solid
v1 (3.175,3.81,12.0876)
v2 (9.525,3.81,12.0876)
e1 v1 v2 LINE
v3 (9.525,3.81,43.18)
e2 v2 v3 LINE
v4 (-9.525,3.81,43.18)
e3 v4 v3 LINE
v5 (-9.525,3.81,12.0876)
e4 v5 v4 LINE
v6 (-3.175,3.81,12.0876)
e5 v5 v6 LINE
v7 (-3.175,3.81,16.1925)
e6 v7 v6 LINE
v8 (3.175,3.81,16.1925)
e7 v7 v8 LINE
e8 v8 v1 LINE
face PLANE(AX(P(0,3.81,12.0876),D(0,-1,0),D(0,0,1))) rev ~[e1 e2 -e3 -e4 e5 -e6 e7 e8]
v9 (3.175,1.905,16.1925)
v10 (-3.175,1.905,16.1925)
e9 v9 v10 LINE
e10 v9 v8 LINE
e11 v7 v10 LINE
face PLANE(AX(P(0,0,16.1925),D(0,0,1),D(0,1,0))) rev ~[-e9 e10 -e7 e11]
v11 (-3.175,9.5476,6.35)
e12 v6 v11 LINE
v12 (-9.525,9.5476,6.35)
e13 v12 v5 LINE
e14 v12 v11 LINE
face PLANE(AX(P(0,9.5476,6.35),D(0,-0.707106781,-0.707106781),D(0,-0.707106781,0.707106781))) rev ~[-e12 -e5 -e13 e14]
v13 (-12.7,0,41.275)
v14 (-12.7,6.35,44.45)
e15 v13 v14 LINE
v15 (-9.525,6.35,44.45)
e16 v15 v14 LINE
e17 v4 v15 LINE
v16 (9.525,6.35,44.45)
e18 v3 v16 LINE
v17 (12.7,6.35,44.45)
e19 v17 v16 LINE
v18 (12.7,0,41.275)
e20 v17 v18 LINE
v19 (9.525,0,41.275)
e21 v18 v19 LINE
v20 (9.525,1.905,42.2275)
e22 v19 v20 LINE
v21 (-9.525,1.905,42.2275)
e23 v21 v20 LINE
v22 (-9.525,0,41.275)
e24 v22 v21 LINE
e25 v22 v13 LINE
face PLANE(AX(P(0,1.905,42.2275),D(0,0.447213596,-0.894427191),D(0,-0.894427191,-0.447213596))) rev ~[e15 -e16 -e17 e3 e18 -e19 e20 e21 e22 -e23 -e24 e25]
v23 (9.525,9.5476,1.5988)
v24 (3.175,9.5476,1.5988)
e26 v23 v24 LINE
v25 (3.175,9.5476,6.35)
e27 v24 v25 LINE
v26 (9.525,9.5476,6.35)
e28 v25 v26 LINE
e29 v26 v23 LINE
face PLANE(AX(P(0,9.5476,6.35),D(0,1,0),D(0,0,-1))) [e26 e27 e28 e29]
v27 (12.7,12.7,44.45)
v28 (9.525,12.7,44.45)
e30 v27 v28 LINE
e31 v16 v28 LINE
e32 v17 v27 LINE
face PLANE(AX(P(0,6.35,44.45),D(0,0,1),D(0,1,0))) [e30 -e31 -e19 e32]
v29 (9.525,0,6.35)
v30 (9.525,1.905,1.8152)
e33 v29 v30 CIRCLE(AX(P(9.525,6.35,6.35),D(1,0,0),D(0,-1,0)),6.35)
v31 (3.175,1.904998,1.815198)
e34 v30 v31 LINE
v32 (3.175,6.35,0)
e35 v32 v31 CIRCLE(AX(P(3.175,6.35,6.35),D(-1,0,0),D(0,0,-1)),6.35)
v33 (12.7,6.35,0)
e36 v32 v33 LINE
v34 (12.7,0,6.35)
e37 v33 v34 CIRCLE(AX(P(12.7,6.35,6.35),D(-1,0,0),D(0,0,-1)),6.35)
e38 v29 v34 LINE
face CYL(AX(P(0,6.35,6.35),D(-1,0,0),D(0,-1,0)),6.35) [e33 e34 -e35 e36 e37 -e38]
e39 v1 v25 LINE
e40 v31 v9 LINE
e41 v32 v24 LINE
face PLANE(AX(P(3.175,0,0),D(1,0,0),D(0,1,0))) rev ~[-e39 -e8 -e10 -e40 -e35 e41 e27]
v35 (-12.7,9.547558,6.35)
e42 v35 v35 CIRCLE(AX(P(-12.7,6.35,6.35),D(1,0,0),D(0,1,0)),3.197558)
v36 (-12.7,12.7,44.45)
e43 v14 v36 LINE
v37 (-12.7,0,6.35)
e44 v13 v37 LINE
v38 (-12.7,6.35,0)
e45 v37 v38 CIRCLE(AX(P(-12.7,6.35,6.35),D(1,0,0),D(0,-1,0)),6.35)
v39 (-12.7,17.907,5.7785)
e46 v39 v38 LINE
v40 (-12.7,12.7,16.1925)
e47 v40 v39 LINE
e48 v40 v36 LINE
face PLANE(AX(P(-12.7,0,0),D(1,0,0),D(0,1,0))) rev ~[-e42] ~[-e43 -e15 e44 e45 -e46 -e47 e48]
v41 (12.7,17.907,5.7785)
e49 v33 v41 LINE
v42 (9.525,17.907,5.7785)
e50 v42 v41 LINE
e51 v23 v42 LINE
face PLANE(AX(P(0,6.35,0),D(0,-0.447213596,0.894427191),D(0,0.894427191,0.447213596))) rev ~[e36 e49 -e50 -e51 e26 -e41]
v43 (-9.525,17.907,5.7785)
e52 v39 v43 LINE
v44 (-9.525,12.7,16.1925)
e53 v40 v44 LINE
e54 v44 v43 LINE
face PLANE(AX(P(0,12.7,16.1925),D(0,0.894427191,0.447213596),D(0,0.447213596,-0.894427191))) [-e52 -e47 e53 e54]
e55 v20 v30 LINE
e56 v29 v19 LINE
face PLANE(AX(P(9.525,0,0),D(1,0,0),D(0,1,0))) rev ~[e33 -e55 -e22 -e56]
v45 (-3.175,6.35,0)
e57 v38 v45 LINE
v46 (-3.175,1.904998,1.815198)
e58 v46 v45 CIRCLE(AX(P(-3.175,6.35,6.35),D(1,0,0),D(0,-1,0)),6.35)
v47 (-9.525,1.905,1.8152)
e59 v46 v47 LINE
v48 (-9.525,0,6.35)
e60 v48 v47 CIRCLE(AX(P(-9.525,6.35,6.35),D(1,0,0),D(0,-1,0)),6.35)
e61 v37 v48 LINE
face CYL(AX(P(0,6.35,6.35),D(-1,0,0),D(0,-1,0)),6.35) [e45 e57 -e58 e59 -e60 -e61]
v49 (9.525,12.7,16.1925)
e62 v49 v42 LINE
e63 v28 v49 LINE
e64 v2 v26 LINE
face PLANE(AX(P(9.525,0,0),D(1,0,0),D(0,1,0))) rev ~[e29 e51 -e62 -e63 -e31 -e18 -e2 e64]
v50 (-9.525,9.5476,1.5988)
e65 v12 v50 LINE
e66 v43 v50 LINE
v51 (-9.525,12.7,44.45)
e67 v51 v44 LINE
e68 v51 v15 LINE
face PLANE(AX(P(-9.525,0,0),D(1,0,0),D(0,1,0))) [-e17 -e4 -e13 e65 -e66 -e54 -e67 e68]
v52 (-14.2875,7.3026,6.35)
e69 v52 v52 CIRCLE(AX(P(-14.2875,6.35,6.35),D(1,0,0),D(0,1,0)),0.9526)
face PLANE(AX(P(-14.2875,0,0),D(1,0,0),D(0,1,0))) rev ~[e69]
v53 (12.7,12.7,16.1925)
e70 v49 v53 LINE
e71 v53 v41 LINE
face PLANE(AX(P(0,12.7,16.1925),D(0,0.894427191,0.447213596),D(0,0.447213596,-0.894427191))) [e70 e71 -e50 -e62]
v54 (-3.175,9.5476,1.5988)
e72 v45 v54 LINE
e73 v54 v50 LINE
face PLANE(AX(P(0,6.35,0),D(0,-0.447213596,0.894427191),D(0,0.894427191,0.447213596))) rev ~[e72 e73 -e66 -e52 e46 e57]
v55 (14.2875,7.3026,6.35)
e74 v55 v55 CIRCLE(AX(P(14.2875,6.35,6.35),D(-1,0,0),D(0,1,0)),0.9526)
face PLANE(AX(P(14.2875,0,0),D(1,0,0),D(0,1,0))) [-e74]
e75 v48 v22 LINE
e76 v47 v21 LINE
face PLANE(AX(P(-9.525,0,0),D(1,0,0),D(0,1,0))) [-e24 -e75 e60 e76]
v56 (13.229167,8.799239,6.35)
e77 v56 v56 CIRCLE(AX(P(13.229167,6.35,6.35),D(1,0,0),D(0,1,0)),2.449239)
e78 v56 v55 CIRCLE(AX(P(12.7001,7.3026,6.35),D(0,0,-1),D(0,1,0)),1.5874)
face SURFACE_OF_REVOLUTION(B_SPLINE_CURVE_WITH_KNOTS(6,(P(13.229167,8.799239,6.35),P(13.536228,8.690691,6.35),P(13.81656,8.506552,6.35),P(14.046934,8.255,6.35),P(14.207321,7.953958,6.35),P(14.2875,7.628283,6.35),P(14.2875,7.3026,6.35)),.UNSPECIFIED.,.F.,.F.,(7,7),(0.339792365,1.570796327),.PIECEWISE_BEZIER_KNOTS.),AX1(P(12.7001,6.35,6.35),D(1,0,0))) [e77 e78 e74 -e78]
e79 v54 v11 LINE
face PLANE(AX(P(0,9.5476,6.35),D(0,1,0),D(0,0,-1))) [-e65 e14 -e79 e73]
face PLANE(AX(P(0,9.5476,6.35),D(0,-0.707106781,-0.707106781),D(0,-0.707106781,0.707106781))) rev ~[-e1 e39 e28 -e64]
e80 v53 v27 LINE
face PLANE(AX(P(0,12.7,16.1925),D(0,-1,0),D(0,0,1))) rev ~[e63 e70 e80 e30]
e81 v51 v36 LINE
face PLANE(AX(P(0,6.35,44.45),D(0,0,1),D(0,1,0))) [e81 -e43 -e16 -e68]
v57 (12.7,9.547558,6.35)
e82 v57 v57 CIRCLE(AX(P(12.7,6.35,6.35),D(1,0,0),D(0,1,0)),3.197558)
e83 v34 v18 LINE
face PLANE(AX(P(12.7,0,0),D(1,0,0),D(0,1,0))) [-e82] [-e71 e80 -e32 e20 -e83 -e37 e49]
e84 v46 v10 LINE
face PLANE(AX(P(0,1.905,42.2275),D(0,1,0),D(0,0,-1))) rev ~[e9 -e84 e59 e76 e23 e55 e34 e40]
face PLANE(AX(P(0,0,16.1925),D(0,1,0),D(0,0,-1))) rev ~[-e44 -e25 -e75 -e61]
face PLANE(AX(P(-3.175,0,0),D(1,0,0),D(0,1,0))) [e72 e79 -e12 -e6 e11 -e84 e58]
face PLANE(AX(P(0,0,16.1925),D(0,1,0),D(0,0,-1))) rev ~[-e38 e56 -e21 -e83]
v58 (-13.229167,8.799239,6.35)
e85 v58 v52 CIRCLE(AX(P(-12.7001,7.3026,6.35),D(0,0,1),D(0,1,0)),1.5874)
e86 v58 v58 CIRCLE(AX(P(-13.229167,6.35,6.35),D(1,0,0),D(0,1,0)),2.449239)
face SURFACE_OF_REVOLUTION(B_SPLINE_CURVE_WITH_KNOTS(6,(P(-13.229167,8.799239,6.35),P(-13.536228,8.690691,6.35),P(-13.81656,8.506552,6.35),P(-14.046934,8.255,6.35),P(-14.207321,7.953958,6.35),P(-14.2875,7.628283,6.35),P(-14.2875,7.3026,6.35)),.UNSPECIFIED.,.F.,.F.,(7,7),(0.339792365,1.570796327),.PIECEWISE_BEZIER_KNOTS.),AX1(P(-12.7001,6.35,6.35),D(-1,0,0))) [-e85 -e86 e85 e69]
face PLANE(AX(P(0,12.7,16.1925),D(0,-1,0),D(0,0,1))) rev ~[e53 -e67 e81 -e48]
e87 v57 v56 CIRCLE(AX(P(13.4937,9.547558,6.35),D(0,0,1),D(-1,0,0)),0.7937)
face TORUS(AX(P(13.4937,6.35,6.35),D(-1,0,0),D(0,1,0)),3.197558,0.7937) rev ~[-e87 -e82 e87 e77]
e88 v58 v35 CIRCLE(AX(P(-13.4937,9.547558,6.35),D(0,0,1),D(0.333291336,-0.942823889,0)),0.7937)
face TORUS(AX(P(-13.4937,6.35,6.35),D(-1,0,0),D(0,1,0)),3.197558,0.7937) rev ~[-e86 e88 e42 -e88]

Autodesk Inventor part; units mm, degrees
ref_plane "YZ Plane" through (0, 0, 0) normal (1, 0, 0) x (0, 1, 0)
ref_plane "XZ Plane" through (0, 0, 0) normal (0, 1, 0) x (-1, 0, 0)
ref_plane "XY Plane" through (0, 0, 0) normal (0, 0, 1) x (1, 0, 0)
sketch "Sketch2" plane through (0, 0, 0) normal (1, 0, 0) x (0, 1, 0)
  line L0 (0, 0) -> (12.7, 0) construction
  line L1 (12.7, 0) -> (12.7, 44.45) construction
  line L2 (12.7, 44.45) -> (0, 44.45) construction
  line L3 (0, 44.45) -> (0, 0) construction
  arc A0 (0, 6.35) -> (6.35, 0) centre (6.35, 6.35) ccw
  line L4 (6.35, 0) -> (6.35, 44.45) construction
  line L5 (6.35, 44.45) -> (0, 41.275)
  line L6 (0, 41.275) -> (0, 6.35)
  line L7 (6.35, 44.45) -> (6.35, 42.545)
  line L8 (6.35, 42.545) -> (1.905, 40.3225)
  line L9 (1.905, 40.3225) -> (1.905, 9.525)
  line L10 (6.35, 44.45) -> (12.7, 44.45)
  line L11 (6.35, 0) -> (12.7, 3.175)
  line L12 (12.7, 3.175) -> (12.7, 44.45)
  line L13 (6.35, 6.35) -> (6.35, 0)
  line L14 (6.35, 6.35) -> (1.905, 9.525)
  circle A1 centre (6.35, 6.35) radius 2.54
  line L15 (0, 16.1925) -> (12.7, 16.1925)
  line L16 (3.81, 0.5301) -> (3.81, 43.18)
  line L17 (1.905, 9.525) -> (1.905, 1.8152)
  line L18 (1.905, 40.3225) -> (1.905, 42.2275)
  line L19 (12.7, 16.1925) -> (17.907, 5.7785)
  line L20 (12.7, 3.175) -> (17.907, 5.7785)
  dimension "d2" = 12.7
  dimension "d3" = 44.45
  dimension "d4" = 12.7
  dimension "d5" = 3.175
  dimension "d6" = 1.905
  dimension "d7" = 1.905
  dimension "d8" = 3.175
  dimension "d9" = 3.175
  dimension "d10" = 5.08
  dimension "d11" = 16.1925
  dimension "d22" = 1.905
extrude "Extrusion1" add sketch "Sketch2" along normal mid plane 28.575 contours A1 L14 L13 | L13 L14 A1
extrude "Extrusion2" add sketch "Sketch2" along normal mid plane 25.4
extrude "Extrusion4" cut sketch "Sketch2" along normal mid plane 6.35 contours L6 L15 L9 L17 A0 | L17 L14 L16 A0 | L16 A1 L13 A0 | L9 L15 L16 L14 | L13 A1 L14 L16 L15 L12 L11 | L16 L14 A1 | A1 L14 L13 | L13 L14 A1
fillet "Fillet1" radius 1.5875 2 edges at (-14.2875, 3.81, 6.35) (14.2875, 3.81, 6.35)
fillet "Fillet2" radius 0.7937 4 edges at (-12.7, 3.81, 6.35) (-12.7001, 3.81, 6.35) (12.7001, 3.81, 6.35) (12.7, 3.81, 6.35)
sketch "Sketch3" plane through (0, 0, 0) normal (1, 0, 0) x (0, 1, 0)
  line L0 (12.7, 44.45) -> (12.7, 16.1925) projected
  line L1 (17.907, 5.7785) -> (6.35, 0) projected
  arc A0 (0, 6.35) -> (6.35, 0) centre (6.35, 6.35) ccw projected
  line L2 (0, 6.35) -> (0, 41.275) projected
  line L3 (0, 41.275) -> (6.35, 44.45) projected
  line L4 (6.35, 44.45) -> (12.7, 44.45) projected
  circle A1 centre (6.35, 6.35) radius 3.1976 projected
  circle A2 centre (6.35, 6.35) radius 3.1976 projected
  line L5 (3.81, 0.5301) -> (3.81, 43.18) projected
  line L6 (1.905, 40.3225) -> (1.905, 9.525) projected
  line L7 (1.905, 42.2275) -> (1.905, 1.8152)
  line L8 (0, 0) -> (1.905, 0)
  line L9 (1.905, 0) -> (1.905, 42.2275)
  line L10 (1.905, 42.2275) -> (0, 42.2275)
  line L11 (0, 42.2275) -> (0, 0)
  circle A3 centre (6.35, 6.35) radius 3.1976
  line L12 (9.5476, 44.45) -> (9.5476, 1.5988)
  line L13 (12.7, 44.45) -> (9.5476, 44.45)
  line L14 (9.5476, 44.45) -> (9.5476, 0)
  line L15 (9.5476, 0) -> (12.7, 0)
  line L16 (12.7, 0) -> (12.7, 44.45)
  line L17 (6.3337, 9.5475) -> (1.905, 9.525)
  circle A4 centre (6.35, 6.35) radius 3.1976
  line L18 (9.5476, 6.35) -> (9.5476, 0)
  line L19 (9.5476, 0) -> (1.905, 0)
  line L20 (9.5476, 7.1442) -> (9.5476, 44.45)
  line L21 (6.35, 44.45) -> (3.81, 43.18)
  line L22 (3.81, 12.0876) -> (3.81, 43.18)
  line L23 (1.905, 42.2275) -> (6.35, 44.45)
  line L24 (6.35, 44.45) -> (9.5476, 44.45)
  line L25 (9.5476, 44.45) -> (9.5476, 6.35)
  line L26 (9.5476, 6.35) -> (1.905, 13.9926)
  line L27 (12.7, 16.1925) -> (17.907, 5.7785) projected
  dimension "d25" = 1.905
extrude "Extrusion6" cut sketch "Sketch3" along normal mid plane 19.05 contours L0 L16 L1 L12 L4 | L27 L1 L16 | L12 A1 L26 L5 L3 L4 | L26 A1 | L7 L6 A0 L2 L3
equation "\"d7\" = d6"
equation "\"d22\" = d7"
properties part number "LegV2"
